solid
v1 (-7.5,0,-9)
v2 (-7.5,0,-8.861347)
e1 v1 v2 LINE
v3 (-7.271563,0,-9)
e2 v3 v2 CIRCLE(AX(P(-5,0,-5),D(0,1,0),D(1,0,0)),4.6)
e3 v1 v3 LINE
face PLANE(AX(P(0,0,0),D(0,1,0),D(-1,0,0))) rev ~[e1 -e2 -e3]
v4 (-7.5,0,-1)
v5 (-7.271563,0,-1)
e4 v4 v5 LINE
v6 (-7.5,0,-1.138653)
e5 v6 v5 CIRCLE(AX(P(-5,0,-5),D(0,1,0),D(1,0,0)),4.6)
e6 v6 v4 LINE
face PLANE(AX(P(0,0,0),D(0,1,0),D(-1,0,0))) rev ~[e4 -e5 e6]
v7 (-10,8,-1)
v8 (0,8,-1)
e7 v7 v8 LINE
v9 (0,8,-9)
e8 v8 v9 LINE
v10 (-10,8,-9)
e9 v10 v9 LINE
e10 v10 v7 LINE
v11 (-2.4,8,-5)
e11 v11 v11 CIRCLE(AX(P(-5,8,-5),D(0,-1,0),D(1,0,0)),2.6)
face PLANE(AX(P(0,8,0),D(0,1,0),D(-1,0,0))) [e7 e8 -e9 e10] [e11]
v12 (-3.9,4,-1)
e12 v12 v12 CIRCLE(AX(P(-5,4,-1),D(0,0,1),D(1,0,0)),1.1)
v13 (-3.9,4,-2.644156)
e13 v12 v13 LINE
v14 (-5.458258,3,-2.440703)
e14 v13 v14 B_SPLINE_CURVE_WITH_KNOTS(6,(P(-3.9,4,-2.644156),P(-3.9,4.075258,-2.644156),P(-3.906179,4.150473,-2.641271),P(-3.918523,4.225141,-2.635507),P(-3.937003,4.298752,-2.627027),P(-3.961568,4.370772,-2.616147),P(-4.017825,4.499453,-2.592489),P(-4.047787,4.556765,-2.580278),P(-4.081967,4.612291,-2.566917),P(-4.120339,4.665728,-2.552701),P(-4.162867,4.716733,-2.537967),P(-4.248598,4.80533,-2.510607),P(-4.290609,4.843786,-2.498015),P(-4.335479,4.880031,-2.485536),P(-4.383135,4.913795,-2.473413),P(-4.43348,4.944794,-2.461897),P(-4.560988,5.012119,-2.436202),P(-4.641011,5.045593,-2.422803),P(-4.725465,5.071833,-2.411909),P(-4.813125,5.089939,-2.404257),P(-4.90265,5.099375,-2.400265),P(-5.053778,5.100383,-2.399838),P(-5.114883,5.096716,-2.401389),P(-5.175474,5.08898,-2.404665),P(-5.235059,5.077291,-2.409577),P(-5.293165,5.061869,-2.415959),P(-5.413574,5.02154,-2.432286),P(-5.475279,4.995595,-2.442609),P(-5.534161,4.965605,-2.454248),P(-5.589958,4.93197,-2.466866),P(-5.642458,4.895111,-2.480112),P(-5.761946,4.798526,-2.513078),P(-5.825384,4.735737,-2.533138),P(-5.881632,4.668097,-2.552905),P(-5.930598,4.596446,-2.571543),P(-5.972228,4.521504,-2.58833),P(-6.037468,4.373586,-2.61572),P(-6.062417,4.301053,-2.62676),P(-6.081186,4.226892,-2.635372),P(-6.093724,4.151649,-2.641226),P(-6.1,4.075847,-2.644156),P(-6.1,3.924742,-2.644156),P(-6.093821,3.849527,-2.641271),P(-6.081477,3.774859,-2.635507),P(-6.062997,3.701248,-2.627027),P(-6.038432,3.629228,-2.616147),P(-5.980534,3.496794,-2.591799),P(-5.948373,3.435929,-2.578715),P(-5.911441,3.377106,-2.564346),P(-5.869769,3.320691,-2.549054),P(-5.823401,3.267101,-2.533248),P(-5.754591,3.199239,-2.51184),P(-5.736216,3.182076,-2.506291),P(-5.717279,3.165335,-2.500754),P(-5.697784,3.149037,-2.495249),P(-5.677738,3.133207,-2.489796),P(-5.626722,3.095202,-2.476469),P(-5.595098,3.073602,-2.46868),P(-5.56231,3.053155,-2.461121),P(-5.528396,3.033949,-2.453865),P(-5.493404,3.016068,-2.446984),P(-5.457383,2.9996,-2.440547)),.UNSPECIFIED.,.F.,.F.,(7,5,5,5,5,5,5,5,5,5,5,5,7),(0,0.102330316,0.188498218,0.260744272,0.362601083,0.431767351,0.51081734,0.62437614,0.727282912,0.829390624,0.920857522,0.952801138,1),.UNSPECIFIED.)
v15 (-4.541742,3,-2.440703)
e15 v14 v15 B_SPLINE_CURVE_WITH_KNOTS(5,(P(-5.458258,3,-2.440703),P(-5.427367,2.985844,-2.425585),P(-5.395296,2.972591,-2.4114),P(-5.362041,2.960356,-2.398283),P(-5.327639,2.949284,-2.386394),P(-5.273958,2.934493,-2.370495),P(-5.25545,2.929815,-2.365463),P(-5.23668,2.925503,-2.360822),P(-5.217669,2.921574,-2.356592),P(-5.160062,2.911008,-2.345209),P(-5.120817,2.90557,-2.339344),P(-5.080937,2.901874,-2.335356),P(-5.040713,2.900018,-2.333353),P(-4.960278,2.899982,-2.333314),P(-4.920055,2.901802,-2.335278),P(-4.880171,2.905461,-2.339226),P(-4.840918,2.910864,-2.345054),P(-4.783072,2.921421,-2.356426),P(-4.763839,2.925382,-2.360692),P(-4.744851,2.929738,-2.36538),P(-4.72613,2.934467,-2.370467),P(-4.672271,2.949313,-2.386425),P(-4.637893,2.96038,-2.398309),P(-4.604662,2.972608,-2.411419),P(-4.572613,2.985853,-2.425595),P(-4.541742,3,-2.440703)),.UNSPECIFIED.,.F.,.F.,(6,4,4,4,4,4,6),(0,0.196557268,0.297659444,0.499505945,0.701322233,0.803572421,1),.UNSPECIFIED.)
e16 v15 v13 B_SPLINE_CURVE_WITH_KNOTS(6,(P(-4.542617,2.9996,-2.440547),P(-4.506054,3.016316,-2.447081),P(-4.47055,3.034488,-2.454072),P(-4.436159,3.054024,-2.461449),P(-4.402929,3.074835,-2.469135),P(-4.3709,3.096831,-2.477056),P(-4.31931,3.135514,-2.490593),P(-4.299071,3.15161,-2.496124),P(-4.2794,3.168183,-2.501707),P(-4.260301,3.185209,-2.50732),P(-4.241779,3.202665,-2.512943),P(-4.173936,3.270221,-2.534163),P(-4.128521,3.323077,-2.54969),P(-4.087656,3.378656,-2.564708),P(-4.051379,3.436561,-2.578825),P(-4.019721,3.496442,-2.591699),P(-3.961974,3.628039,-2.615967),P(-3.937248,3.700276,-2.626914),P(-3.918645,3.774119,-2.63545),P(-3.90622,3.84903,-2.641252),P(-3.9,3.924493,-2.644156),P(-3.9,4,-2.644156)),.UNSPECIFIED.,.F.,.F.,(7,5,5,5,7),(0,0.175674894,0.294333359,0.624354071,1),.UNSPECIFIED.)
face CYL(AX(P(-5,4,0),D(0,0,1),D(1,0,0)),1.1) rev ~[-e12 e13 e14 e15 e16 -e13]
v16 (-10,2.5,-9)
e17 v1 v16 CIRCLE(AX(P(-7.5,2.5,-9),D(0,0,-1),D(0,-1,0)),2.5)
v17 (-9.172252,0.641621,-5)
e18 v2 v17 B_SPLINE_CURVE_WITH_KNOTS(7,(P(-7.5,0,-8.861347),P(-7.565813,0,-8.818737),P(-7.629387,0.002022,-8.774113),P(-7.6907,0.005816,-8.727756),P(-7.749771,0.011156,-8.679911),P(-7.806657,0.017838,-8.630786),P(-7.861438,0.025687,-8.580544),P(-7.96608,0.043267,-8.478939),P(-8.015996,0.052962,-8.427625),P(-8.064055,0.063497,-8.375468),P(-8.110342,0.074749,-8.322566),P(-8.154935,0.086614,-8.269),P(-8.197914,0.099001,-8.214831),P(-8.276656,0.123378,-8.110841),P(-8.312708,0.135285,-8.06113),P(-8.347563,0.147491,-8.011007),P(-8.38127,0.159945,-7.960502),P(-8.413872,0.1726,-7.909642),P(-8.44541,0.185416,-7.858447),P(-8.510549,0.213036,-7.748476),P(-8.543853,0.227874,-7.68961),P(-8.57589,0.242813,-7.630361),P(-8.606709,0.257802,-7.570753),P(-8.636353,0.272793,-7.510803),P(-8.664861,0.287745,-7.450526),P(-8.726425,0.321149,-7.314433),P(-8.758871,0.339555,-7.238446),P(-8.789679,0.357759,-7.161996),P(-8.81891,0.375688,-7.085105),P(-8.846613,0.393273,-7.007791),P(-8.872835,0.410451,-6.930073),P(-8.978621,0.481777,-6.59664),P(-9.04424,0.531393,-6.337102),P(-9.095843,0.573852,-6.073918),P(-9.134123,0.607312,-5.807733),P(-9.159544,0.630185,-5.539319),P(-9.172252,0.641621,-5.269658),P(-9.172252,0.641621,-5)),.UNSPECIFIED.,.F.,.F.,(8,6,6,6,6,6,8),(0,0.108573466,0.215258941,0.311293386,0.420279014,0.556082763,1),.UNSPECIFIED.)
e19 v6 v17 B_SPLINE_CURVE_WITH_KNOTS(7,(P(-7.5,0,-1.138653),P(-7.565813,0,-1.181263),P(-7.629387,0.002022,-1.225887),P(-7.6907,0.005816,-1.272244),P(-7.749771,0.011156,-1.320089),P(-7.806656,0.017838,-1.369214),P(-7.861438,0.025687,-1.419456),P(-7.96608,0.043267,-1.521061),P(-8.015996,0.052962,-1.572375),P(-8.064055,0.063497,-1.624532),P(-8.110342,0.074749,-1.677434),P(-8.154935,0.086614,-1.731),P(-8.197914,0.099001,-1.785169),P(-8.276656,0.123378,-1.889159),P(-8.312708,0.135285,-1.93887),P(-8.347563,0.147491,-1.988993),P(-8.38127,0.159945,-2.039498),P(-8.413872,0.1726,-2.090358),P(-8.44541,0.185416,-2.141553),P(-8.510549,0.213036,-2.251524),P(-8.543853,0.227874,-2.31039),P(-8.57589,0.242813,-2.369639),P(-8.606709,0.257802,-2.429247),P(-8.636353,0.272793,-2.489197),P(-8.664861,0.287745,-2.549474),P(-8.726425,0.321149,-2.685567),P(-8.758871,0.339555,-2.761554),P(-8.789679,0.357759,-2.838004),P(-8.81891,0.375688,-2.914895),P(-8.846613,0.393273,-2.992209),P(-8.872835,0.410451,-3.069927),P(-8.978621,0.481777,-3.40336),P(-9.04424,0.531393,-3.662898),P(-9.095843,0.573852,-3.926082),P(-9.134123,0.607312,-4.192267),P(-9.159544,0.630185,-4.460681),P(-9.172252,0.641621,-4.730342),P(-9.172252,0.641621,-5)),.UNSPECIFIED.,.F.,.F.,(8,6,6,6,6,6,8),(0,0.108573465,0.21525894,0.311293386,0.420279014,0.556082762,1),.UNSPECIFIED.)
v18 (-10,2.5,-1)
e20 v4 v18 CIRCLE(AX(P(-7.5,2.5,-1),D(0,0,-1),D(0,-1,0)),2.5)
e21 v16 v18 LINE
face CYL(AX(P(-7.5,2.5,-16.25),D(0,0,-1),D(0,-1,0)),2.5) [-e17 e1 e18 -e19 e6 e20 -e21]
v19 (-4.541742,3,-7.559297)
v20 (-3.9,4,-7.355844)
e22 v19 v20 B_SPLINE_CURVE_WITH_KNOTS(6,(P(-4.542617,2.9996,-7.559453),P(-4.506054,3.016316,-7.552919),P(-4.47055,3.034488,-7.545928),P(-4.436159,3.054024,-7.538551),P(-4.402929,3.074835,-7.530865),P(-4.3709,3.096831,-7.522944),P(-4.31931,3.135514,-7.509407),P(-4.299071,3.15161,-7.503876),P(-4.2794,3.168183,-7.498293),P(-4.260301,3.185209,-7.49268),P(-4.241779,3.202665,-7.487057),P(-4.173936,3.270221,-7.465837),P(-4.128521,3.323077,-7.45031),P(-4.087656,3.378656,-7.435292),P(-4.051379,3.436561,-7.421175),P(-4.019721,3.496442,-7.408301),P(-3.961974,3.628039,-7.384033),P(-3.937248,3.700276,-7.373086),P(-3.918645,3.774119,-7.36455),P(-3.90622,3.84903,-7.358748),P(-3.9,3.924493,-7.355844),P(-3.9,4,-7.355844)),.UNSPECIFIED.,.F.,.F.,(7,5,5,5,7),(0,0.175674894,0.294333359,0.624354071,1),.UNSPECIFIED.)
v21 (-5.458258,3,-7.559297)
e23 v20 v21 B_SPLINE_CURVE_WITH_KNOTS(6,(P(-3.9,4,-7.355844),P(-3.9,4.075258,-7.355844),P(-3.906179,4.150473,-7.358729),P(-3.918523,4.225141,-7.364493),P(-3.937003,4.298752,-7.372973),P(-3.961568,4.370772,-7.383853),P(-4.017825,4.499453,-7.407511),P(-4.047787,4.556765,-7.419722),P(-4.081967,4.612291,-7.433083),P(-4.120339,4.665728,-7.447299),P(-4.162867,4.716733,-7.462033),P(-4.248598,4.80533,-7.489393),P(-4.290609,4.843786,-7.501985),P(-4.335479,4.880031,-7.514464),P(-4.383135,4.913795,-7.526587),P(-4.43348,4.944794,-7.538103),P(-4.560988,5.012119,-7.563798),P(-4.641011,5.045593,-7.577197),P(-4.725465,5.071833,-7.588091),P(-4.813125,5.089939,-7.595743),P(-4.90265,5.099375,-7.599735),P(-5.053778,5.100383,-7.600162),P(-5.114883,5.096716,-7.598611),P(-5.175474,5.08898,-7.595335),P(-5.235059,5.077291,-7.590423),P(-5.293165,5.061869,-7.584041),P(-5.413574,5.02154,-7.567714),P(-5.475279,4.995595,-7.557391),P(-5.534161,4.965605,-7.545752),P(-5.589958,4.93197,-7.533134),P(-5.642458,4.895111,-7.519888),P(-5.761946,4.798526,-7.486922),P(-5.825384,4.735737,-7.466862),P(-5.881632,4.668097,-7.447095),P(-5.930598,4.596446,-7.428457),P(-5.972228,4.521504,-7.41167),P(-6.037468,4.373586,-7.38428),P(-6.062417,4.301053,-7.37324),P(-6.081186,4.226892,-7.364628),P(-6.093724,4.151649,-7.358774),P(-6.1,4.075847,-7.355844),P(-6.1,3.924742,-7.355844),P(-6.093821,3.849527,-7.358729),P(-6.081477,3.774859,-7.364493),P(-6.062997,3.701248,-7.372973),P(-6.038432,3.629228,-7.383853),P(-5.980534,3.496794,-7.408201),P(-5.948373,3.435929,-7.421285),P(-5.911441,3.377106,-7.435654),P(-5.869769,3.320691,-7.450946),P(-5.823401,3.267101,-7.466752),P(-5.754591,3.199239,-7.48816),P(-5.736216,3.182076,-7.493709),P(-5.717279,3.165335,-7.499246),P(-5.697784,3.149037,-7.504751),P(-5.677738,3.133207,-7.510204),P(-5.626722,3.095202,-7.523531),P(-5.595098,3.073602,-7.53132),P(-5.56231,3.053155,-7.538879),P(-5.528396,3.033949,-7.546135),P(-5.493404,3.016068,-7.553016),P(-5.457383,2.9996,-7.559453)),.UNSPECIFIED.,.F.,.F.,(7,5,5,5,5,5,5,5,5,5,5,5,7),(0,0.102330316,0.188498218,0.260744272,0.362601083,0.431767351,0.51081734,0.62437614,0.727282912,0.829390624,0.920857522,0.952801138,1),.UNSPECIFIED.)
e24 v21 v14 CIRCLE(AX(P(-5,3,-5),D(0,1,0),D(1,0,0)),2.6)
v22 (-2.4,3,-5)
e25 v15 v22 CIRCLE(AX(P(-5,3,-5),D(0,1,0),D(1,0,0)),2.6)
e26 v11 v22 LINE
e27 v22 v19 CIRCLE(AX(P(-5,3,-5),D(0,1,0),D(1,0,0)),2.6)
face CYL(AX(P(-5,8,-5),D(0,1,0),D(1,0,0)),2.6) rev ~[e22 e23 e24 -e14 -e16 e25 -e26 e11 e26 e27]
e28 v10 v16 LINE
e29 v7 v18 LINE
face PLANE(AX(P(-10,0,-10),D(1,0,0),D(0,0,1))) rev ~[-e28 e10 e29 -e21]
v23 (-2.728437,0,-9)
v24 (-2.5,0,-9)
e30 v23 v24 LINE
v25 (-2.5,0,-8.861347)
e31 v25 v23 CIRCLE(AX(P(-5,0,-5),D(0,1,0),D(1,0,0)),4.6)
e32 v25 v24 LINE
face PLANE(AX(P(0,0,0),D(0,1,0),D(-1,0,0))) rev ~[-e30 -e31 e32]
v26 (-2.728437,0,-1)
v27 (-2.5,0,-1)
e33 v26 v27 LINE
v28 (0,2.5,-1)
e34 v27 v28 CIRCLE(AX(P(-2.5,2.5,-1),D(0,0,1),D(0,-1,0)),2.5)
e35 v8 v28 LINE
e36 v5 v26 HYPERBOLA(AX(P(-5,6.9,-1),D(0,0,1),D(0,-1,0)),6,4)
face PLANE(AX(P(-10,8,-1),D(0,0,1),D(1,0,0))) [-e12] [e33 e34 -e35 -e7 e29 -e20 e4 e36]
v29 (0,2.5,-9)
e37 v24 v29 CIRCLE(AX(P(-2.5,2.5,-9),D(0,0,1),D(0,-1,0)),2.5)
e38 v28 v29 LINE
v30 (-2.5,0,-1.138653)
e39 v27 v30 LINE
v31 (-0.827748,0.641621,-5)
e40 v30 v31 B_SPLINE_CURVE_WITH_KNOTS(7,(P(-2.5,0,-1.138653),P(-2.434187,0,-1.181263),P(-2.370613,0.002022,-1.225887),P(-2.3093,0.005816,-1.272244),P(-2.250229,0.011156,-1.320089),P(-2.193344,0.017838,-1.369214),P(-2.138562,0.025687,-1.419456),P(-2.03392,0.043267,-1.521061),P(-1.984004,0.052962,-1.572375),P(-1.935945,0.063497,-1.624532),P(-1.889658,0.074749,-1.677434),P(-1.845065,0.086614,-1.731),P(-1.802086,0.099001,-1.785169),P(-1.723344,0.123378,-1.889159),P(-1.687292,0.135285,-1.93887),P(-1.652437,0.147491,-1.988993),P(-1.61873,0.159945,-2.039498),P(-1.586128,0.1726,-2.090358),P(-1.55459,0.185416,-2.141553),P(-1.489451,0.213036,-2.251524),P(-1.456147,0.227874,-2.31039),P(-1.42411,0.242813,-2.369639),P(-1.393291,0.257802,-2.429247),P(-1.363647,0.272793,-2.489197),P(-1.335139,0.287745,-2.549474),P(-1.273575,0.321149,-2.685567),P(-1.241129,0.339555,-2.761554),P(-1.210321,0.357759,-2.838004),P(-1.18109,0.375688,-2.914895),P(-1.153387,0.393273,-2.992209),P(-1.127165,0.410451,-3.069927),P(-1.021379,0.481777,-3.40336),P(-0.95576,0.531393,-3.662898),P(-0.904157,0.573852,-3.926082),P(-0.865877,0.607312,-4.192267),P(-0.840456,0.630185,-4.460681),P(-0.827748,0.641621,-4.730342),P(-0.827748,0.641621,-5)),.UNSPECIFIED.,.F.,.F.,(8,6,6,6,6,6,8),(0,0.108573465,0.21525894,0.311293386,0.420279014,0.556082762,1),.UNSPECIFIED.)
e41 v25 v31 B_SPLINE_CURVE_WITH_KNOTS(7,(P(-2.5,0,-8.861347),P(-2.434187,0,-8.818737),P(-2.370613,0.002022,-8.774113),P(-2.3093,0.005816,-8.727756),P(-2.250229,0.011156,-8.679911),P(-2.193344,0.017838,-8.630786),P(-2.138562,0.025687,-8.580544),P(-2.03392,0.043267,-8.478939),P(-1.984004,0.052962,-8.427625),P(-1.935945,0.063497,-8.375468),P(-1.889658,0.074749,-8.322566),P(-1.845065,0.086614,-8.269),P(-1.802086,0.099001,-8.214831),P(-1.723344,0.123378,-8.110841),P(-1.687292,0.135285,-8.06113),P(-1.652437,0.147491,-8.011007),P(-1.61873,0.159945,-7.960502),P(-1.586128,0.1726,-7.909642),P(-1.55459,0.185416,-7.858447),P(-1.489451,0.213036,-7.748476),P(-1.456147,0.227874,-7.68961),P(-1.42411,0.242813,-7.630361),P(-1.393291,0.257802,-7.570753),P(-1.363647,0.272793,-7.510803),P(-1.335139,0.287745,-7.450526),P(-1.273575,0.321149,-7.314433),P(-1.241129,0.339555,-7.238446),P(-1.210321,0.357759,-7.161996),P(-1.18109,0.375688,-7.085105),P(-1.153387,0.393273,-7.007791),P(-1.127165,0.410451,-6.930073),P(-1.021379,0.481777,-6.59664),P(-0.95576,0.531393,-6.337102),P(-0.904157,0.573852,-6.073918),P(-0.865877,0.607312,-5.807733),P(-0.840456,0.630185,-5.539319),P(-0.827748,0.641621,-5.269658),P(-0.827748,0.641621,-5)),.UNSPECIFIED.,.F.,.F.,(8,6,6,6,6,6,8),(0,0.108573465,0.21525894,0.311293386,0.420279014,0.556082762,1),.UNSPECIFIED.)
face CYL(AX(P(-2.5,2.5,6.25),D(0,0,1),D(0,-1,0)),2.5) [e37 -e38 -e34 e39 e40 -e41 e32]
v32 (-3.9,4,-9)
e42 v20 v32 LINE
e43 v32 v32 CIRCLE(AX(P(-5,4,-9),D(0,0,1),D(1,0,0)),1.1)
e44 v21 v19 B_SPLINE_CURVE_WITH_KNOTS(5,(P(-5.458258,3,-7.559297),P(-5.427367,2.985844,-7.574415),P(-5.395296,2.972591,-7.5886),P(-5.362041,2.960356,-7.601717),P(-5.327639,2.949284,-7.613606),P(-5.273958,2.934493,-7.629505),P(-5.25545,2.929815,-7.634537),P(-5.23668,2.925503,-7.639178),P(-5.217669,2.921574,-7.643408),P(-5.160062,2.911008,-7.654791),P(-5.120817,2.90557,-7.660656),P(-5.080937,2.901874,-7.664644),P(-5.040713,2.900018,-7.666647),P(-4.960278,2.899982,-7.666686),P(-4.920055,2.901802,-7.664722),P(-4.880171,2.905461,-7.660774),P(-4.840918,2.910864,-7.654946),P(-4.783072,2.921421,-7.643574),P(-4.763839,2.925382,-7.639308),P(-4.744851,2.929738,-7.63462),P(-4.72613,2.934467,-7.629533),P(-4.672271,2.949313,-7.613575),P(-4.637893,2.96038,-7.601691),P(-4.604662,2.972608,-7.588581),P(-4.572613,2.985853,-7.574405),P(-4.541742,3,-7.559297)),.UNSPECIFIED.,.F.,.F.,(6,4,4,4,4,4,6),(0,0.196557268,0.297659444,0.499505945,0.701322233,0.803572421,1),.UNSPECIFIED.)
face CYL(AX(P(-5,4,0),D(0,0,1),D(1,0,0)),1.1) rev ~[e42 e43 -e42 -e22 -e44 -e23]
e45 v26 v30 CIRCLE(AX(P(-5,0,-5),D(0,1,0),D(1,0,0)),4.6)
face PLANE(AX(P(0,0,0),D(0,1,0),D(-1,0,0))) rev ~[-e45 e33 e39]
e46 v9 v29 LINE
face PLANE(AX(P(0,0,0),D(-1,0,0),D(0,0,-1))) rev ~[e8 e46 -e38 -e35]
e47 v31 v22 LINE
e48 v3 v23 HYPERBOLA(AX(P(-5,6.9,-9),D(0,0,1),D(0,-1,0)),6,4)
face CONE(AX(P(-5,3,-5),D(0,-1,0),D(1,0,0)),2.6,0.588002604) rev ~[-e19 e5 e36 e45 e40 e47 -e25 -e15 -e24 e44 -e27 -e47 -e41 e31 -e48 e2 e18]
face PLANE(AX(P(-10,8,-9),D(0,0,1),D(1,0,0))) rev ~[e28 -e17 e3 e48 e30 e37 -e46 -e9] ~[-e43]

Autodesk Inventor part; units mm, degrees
ref_plane "YZ Plane" through (0, 0, 0) normal (1, 0, 0) x (0, 1, 0)
ref_plane "XZ Plane" through (0, 0, 0) normal (0, 1, 0) x (-1, 0, 0)
ref_plane "XY Plane" through (0, 0, 0) normal (0, 0, 1) x (1, 0, 0)
sketch "Sketch1" plane through (0, 0, 0) normal (0, 1, 0) x (-1, 0, 0)
  line L0 (0, 0) -> (0, -10)
  line L1 (0, -10) -> (10, -10)
  line L2 (10, -10) -> (10, 0)
  line L3 (10, 0) -> (0, 0)
  dimension "d0" = 10
  dimension "d1" = 10
extrude "Extrusion1" add sketch "Sketch1" along normal blind 8
sketch "Sketch2" plane through (0, 8, 0) normal (0, 1, 0) x (1, 0, 0)
  line L0 (-10, 10) -> (-10, 0) projected
  line L1 (-10, 0) -> (0, 0) projected
  line L2 (-10, 10) -> (0, 0)
  line L3 (0, 0) -> (-10, 0)
  line L4 (-10, 0) -> (0, 10)
  circle A0 centre (-5, 5) radius 2.6
  dimension "d4" = 5.2
extrude "Extrusion2" cut sketch "Sketch2" against normal through all contours A0 L4 L2 | L2 L4 A0 | L4 L2 A0 | L4 A0 L2
chamfer "Chamfer1" distance 2 distance2 3 1 edges at (-7.6, 0, -5) measured on face at (-5.1045, 0, -9.1937)
sketch "Sketch3" plane through (-10, 0, 0) normal (0, 0, 1) x (1, 0, 0)
  line L0 (7.6, 8) -> (7.6, 3) projected
  line L1 (7.6, 8) -> (10, 8)
  line L2 (10, 8) -> (10, 0)
  line L3 (10, 0) -> (7.6, 0)
  line L4 (0, 0) -> (10, 0) projected
  line L5 (2.4, 8) -> (7.6, 8) projected
  line L6 (7.6, 8) -> (7.6, 0)
  line L7 (0, 8) -> (10, 8) projected
  line L8 (10, 0) -> (10, 8) projected
  line L9 (0, 8) -> (10, 0)
  line L10 (10, 0) -> (0, 0)
  line L11 (10, 8) -> (0, 0)
  circle A0 centre (5, 4) radius 1.1
  dimension "d10" = 2.2
extrude "Extrusion3" cut sketch "Sketch3" against normal through all contours A0 L9 L11 | L11 L9 A0 | L11 A0 L9 | L9 A0 L11
fillet "Fillet1" radius 2.5 2 edges at (0, 0, -5) (-10, 0, -5)
sketch "Sketch4" plane through (0, 8, 0) normal (0, 1, 0) x (1, 0, 0)
  arc A0 (-4.5417, 2.4407) -> (-4.5417, 7.5593) centre (-5, 5) ccw projected
  line L0 (-5, 5) -> (0, 5)
  line L1 (0, 0) -> (0, 10) projected
  line L2 (0, 5) -> (0, 8)
  line L3 (0, 8) -> (-10, 8)
  line L4 (-10, 10) -> (-10, 0) projected
  line L5 (-10, 8) -> (-10, 0)
  line L6 (-10, 0) -> (0, 0)
  line L7 (0, 0) -> (0, 8)
  line L8 (0, 10) -> (-10, 10) projected
  line L9 (0, 8) -> (0, 10)
  line L10 (0, 10) -> (-10, 10)
  line L11 (-10, 10) -> (-10, 8)
  line L12 (-10, 0) -> (-10, 0)
  line L13 (0, 0) -> (-2.5, 0) projected
  line L14 (-10, 0) -> (0, 0)
  line L15 (0, 0) -> (0, 0)
  line L16 (-10, 0) -> (-10, 10) projected
  line L17 (-10, 5) -> (-10, 9)
  line L18 (-10, 9) -> (-10, 1)
  line L19 (-10, 1) -> (0, 1)
  line L20 (0, 10) -> (0, 0) projected
  line L21 (-10, 9) -> (0, 9)
  point P0 (0, 0)
  point P1 (-10, 0)
  dimension "d14" = 3
  dimension "d15" = 8
  dimension "d18" = 8
extrude "Extrusion4" cut sketch "Sketch4" against normal through all contours L6 L4 L19 L1 | L21 L4 L8 L1
properties part number "pist-dolni"
